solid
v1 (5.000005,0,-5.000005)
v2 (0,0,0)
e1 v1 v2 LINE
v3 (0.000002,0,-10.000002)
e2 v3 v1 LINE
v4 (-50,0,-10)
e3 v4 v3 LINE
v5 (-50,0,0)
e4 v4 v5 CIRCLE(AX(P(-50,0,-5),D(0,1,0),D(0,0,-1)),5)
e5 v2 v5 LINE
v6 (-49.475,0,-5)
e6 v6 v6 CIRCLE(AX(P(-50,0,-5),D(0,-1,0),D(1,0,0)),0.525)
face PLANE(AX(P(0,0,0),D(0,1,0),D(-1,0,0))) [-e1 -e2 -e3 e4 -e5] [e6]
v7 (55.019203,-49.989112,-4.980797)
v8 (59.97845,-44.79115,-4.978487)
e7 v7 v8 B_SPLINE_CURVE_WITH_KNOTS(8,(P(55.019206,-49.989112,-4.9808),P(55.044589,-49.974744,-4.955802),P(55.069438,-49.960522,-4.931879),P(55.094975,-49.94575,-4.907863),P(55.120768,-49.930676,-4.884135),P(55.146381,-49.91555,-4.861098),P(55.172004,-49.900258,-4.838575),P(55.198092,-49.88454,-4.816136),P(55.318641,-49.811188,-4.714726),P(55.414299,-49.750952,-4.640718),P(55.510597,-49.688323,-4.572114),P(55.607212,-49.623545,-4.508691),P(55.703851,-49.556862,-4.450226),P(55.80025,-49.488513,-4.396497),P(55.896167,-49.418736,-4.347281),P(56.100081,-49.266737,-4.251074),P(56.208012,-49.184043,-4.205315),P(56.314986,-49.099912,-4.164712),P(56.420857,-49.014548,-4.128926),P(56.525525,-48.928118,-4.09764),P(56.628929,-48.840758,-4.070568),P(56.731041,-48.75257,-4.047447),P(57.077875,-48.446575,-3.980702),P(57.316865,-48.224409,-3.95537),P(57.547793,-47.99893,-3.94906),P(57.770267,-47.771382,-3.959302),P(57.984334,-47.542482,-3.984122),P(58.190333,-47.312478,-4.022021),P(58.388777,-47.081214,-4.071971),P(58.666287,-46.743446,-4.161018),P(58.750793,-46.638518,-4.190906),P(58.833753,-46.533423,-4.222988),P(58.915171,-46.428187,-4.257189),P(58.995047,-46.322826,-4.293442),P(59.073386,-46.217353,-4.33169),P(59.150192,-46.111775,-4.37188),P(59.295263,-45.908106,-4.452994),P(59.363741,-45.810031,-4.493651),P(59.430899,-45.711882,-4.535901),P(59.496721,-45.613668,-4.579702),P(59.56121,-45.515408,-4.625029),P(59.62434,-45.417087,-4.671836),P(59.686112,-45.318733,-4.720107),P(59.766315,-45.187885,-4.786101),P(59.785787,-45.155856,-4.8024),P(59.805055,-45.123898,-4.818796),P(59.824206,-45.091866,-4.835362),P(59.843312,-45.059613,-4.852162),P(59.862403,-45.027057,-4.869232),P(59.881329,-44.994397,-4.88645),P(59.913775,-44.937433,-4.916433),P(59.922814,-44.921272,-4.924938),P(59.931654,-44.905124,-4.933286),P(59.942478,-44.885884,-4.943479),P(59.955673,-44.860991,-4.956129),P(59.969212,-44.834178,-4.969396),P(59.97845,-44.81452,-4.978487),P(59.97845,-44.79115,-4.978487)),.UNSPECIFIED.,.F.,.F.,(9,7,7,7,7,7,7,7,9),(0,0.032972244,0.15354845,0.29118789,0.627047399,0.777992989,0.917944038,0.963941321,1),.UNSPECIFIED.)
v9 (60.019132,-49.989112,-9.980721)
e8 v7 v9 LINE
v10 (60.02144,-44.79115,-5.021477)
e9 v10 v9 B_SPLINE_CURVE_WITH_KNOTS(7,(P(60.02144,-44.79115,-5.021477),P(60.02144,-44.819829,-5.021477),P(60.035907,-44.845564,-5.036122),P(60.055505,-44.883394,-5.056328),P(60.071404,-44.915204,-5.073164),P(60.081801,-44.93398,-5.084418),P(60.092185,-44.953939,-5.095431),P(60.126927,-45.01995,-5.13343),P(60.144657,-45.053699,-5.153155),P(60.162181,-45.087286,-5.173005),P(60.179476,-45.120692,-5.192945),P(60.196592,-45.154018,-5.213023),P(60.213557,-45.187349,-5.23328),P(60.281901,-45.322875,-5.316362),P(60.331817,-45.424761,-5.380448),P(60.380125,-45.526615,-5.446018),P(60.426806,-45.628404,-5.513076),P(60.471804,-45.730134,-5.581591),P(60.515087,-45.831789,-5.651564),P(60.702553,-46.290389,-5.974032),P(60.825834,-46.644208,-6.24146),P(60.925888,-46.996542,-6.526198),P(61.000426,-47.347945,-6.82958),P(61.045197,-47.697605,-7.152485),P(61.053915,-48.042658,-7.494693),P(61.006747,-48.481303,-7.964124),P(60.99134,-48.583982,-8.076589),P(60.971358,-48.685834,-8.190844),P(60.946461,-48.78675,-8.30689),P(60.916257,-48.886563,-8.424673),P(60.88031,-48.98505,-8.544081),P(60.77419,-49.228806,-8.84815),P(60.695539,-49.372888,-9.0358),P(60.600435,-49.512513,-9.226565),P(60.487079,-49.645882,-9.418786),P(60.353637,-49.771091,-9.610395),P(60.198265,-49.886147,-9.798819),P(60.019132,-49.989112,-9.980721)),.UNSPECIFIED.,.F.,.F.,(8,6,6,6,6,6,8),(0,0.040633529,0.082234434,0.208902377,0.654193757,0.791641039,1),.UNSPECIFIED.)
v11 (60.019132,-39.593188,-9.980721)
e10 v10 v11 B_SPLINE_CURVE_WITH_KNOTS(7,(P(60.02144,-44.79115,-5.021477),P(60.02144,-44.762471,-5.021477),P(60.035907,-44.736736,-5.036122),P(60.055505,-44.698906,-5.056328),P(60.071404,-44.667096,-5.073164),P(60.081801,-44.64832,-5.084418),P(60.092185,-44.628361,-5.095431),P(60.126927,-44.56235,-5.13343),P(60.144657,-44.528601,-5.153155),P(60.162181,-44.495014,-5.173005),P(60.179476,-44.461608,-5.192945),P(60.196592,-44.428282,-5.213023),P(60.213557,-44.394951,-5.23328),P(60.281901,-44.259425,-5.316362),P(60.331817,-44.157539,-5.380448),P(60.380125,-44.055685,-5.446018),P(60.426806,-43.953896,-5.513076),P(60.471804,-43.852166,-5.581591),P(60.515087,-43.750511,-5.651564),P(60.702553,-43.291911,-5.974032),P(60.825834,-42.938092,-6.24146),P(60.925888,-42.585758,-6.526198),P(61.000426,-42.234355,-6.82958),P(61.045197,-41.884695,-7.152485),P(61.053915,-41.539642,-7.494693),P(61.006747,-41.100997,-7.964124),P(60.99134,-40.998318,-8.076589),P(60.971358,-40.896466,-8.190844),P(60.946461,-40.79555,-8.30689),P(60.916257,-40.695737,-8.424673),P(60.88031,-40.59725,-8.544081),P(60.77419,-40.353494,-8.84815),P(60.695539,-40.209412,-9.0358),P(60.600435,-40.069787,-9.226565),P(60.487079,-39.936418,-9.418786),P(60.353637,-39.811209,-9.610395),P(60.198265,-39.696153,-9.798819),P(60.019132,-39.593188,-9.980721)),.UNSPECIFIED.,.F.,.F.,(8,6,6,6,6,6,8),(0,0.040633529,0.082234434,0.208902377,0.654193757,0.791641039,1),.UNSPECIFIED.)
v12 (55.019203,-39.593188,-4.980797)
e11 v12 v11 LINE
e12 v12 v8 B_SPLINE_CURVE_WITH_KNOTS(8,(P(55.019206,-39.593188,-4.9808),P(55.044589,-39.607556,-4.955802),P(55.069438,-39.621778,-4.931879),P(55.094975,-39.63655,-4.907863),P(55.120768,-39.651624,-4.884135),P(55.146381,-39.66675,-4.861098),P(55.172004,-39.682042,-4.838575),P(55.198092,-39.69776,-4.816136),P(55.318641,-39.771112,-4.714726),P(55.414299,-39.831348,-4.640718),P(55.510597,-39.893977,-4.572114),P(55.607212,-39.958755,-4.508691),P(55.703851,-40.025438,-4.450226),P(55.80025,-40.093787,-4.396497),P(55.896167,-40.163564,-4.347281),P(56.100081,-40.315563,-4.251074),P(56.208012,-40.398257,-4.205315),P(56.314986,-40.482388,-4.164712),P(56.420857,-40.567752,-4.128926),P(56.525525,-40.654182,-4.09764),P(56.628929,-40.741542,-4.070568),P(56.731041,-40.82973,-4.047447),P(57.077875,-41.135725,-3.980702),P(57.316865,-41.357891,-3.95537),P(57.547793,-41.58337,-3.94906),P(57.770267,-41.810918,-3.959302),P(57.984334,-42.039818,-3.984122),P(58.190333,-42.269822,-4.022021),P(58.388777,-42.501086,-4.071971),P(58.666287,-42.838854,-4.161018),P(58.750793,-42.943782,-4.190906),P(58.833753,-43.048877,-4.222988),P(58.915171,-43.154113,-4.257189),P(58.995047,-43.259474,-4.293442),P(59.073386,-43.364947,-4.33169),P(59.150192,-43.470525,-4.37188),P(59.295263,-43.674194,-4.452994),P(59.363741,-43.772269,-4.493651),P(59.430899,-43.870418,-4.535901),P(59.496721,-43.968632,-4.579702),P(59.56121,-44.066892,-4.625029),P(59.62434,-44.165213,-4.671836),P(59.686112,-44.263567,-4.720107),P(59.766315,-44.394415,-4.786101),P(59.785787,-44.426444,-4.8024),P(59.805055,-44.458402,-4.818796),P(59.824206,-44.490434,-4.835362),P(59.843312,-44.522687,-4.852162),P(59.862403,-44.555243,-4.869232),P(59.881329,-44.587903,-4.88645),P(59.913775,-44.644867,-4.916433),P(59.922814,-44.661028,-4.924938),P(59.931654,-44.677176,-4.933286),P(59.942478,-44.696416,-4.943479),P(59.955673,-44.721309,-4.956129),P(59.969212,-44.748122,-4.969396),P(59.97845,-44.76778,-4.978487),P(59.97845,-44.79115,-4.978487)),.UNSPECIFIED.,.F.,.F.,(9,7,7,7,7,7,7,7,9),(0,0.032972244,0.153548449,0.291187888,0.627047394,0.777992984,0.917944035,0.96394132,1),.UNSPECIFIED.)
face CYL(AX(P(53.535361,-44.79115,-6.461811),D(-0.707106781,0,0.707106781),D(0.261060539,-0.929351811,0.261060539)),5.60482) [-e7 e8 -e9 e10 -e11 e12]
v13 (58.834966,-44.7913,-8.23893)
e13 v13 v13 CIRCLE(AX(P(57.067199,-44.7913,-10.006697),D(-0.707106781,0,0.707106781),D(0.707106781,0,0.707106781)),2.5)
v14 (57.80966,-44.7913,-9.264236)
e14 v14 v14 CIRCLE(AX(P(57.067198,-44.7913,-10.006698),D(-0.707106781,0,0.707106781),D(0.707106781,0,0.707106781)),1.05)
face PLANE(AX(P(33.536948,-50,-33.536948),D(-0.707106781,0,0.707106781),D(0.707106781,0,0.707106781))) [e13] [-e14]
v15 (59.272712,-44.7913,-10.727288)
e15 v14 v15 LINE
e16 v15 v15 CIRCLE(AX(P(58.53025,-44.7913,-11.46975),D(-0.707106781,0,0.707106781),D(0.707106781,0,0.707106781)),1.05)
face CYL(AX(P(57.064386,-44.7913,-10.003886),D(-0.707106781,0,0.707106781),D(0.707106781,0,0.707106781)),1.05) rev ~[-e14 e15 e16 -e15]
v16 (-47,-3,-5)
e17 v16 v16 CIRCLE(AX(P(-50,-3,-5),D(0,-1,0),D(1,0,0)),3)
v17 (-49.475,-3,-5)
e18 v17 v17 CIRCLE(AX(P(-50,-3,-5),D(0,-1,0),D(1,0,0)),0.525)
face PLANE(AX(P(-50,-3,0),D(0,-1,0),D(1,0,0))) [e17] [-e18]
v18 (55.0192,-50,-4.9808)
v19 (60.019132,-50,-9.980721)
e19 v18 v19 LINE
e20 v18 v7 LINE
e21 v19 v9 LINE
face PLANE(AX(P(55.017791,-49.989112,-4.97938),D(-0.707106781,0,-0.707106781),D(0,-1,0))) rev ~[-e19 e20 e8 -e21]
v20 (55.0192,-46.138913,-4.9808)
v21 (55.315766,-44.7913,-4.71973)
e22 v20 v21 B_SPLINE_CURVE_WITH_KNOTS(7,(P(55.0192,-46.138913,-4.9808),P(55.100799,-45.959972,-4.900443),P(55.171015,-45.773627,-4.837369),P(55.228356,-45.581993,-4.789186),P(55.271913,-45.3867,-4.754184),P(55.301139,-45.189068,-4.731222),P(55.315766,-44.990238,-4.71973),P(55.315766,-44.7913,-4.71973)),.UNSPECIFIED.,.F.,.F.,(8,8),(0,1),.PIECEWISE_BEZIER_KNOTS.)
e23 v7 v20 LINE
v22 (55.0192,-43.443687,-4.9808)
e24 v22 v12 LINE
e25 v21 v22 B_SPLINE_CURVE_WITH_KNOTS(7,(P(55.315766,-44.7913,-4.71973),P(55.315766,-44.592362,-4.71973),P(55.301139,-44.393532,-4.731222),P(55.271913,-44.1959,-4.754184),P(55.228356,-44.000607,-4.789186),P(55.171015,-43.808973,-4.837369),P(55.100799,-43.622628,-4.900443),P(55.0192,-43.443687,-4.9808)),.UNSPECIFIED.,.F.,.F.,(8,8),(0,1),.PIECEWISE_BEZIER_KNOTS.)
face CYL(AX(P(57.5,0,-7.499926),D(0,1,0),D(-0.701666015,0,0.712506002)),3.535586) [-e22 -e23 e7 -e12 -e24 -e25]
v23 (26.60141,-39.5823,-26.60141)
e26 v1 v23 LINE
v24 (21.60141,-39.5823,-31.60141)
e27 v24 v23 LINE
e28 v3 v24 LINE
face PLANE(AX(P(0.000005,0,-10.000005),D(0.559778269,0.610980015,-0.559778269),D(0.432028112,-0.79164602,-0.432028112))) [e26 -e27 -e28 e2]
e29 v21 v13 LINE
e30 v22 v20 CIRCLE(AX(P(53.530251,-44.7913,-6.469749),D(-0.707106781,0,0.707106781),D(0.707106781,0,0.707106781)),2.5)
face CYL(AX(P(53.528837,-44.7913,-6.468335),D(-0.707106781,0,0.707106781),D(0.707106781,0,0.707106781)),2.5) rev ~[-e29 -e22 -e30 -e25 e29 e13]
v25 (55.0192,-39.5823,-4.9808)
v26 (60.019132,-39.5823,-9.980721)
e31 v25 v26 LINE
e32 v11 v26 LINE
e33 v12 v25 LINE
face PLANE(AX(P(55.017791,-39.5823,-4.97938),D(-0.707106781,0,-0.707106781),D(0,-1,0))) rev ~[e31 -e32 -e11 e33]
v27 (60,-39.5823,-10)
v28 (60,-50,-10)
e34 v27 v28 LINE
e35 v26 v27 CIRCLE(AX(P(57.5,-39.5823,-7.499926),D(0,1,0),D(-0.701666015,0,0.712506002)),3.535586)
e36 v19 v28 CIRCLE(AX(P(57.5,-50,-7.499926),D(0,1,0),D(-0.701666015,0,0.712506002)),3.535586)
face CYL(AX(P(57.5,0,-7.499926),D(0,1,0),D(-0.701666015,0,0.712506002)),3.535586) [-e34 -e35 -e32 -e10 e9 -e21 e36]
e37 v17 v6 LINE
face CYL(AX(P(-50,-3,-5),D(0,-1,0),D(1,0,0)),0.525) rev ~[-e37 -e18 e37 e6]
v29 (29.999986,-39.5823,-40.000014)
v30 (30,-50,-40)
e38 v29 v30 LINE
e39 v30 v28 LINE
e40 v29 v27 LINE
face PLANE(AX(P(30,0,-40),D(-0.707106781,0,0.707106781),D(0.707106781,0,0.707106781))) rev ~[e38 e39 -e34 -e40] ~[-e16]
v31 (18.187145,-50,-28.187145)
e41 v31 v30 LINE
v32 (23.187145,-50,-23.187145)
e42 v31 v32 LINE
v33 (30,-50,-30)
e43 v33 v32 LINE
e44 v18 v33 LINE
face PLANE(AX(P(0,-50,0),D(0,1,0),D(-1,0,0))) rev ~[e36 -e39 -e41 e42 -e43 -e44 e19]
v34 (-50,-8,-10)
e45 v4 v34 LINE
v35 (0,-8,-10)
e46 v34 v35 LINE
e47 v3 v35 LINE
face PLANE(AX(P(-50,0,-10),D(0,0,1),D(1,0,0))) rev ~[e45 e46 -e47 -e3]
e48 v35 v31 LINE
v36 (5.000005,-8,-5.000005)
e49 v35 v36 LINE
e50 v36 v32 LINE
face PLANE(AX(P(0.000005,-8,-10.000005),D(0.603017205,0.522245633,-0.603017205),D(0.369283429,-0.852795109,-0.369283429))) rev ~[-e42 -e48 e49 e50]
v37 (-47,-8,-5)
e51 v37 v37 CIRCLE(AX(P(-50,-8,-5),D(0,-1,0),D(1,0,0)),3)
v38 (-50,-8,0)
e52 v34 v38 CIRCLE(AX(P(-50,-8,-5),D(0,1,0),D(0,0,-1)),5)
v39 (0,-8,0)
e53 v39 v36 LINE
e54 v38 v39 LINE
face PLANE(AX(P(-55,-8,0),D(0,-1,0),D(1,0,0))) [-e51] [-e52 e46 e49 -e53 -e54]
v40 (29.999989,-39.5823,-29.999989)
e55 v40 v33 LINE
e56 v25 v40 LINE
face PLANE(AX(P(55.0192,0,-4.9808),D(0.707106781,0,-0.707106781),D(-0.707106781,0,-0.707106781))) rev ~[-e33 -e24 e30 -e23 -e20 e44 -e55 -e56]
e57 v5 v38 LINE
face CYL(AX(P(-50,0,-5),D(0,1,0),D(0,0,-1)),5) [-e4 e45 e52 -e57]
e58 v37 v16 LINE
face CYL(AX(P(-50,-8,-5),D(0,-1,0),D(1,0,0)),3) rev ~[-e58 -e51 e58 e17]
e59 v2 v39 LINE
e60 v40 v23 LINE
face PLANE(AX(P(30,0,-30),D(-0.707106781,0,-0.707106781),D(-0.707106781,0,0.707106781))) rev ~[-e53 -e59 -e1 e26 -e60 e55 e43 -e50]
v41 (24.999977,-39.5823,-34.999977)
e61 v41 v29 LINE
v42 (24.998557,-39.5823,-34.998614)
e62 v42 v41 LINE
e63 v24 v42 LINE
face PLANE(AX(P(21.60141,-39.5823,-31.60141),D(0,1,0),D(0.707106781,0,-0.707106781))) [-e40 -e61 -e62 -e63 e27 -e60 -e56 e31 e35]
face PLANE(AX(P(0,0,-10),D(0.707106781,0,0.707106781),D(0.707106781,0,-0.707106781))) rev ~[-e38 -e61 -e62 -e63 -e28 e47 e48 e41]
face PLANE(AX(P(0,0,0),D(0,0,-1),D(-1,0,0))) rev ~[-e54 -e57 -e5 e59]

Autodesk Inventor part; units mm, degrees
ref_plane "YZ Plane" through (0, 0, 0) normal (1, 0, 0) x (0, 1, 0)
ref_plane "XZ Plane" through (0, 0, 0) normal (0, 1, 0) x (-1, 0, 0)
ref_plane "XY Plane" through (0, 0, 0) normal (0, 0, 1) x (1, 0, 0)
sketch "Sketch1" plane through (0, 0, 0) normal (0, 1, 0) x (-1, 0, 0)
  line L0 (0, 0) -> (50, 0)
  arc A0 (50, -10) -> (50, 0) centre (50, -5) ccw
  line L1 (50, -10) -> (0, -10)
  line L2 (0, -10) -> (-30, -40)
  line L3 (-30, -40) -> (-60, -10)
  arc A1 (-55.0192, -4.9808) -> (-60, -10) centre (-57.5, -7.5) ccw
  line L4 (-55.0192, -4.9808) -> (-30, -30)
  line L5 (-30, -30) -> (0, 0)
  dimension "d0" = 10
  dimension "d1" = 5
  dimension "d2" = 50
  dimension "d4" = 135
  dimension "d5" = 50
  dimension "d6" = 135
  dimension "d7" = 30
  dimension "d9" = 90
  dimension "d10" = 3.5356
  dimension "d40" = 30
extrude "Extrusion1" add sketch "Sketch1" against normal blind 50
sketch "Sketch2" plane through (-50, 0, 0) normal (0, 0, 1) x (1, 0, 0)
  line L0 (-5, 0) -> (-5, -50) projected
  line L1 (80, -50) -> (50, -50) projected
  line L2 (-5, -8) -> (50, -8)
  line L3 (50, -8) -> (50, -50)
  line L4 (50, -50) -> (-5, -50)
  line L5 (-5, -50) -> (-5, -8)
  line L6 (0, 0) -> (50, 0) projected
  dimension "d13" = 8
extrude "Extrusion2" cut sketch "Sketch2" against normal blind 50
sketch "Sketch3" plane through (-50, -8, 0) normal (0, -1, 0) x (1, 0, 0)
  line L0 (0, 0) -> (50, 0) projected
  arc A0 (0, 0) -> (0, -10) centre (0, -5) ccw projected
  circle A1 centre (0, -5) radius 3
  dimension "d19" = 3
extrude "Extrusion3" cut sketch "Sketch3" against normal blind 5
sketch "Sketch4" plane through (-50, -3, -5) normal (0, -1, 0) x (1, 0, 0)
  circle A0 centre (0, 0) radius 0.525
  point P0 (50, 5)
  dimension "d22" = 1.05
extrude "Extrusion4" cut sketch "Sketch4" against normal blind 5
sketch "Sketch5" plane through (30, -50, -40) normal (-0.7071068, 0, -0.7071068) x (-0.7071068, 0, 0.7071068)
  line L0 (42.4264, 42) -> (77.7817, 42) projected
  line L1 (42.4264, 42) -> (16.7059, 0)
  line L2 (42.4264, 0) -> (0, 0) projected
  line L3 (16.7059, 0) -> (42.4264, 0)
  line L4 (42.4264, 0) -> (42.4264, 42)
  line L5 (42.4264, 42) -> (42.4264, 0) projected
  line L6 (7.0711, 50) -> (7.0711, 0) projected
  line L7 (0, 50) -> (42.4264, 50) projected
  line L8 (7.0711, 50) -> (42.4264, 50)
  line L9 (42.4264, 50) -> (11.8774, 10.4177)
  line L10 (11.8774, 10.4177) -> (7.0711, 10.4177)
  line L11 (7.0711, 10.4177) -> (7.0711, 50)
  point P0 (49.4975, 50)
  point P1 (7.0711, 10.4177)
  dimension "d41" = 50
extrude "Extrusion5" cut sketch "Sketch5" against normal through all
sketch "Sketch7" plane through (0, -50, 0) normal (0.7071068, 0, 0.7071068) x (0.7071068, 0, -0.7071068)
  line L0 (0, 42) -> (7.0711, 42) projected
  line L1 (7.0711, 0) -> (7.0711, 42) projected
  line L2 (0, 42) -> (7.0711, 42)
  line L3 (7.0711, 42) -> (7.0711, 0)
  line L4 (7.0711, 0) -> (0, 0)
  line L5 (0, 0) -> (0, 42)
  point P0 (0, 50)
extrude "Extrusion6" cut sketch "Sketch7" against normal through all
sketch "Sketch8" plane through (55.0192, -50, -4.9808) normal (-0.7071068, 0, 0.7071068) x (0.7071068, 0, 0.7071068)
  line L0 (-42.4536, 10.4177) -> (-42.4536, 50) projected
  line L1 (-42.4536, 10.4177) -> (3.5084, 10.4177)
  line L2 (3.5084, 10.4177) -> (3.5084, 50.93)
  line L3 (3.5084, 50.93) -> (-42.4536, 50.93)
  line L4 (-42.4536, 50.93) -> (-42.4536, 10.4177)
  point P0 (-35.3825, 50)
  point P1 (-42.4536, 50)
  point P2 (-42.4536, 14.8933)
  point P3 (-42.4536, 14.8933)
extrude "Extrusion7" cut sketch "Sketch8" against normal blind 10
sketch "Sketch9" plane through (30, -50, -30) normal (-0.7071068, 0, 0.7071068) x (0.7071068, 0, 0.7071068)
  line L0 (-7.0711, 0) -> (35.3553, 0) projected
  line L1 (35.3553, 10.4177) -> (35.3553, 0) projected
  arc A0 (35.3553, 0) -> (35.3553, 10.4177) centre (33.2861, 5.2088) ccw
  line L2 (38.8909, 10.4177) -> (38.8909, 0) projected
  line L3 (35.3825, 10.4177) -> (35.3825, 0) projected
  line L4 (35.3825, 10.4177) -> (38.8909, 10.4177)
  line L5 (35.3553, 0) -> (38.8909, 0) projected
  line L6 (38.8909, 0) -> (38.8909, 10.4177)
  line L7 (38.8909, 0) -> (35.3553, 0)
  point P0 (0, 50)
  point P1 (35.3825, 10.4068)
  point P2 (38.8909, 5.2088)
  point P3 (35.3825, 0.0109)
extrude "Extrusion8" cut sketch "Sketch9" against normal blind 10 contours L3 L4 L2 A0 | A0 L2 L5 L3
sketch "Sketch10" plane through (30, -50, -30) normal (-0.7071068, 0, 0.7071068) x (0.7071068, 0, 0.7071068)
  line L0 (35.3825, 10.4177) -> (0, 10.4177) projected
  circle A0 centre (33.2768, 5.2087) radius 2.5
  point P0 (0, 50)
  dimension "d33" = 5.209
  dimension "d34" = 2.5
extrude "Extrusion9" cut sketch "Sketch10" against normal blind 5
sketch "Sketch11" plane through (57.0658, -44.7913, -10.0053) normal (-0.7071068, 0, 0.7071068) x (0.7071068, 0, 0.7071068)
  circle A0 centre (0, 0) radius 1.05
  point P0 (-33.2768, 44.7913)
  dimension "d37" = 1.05
extrude "Extrusion10" cut sketch "Sketch11" against normal blind 11
properties part number "connector"
